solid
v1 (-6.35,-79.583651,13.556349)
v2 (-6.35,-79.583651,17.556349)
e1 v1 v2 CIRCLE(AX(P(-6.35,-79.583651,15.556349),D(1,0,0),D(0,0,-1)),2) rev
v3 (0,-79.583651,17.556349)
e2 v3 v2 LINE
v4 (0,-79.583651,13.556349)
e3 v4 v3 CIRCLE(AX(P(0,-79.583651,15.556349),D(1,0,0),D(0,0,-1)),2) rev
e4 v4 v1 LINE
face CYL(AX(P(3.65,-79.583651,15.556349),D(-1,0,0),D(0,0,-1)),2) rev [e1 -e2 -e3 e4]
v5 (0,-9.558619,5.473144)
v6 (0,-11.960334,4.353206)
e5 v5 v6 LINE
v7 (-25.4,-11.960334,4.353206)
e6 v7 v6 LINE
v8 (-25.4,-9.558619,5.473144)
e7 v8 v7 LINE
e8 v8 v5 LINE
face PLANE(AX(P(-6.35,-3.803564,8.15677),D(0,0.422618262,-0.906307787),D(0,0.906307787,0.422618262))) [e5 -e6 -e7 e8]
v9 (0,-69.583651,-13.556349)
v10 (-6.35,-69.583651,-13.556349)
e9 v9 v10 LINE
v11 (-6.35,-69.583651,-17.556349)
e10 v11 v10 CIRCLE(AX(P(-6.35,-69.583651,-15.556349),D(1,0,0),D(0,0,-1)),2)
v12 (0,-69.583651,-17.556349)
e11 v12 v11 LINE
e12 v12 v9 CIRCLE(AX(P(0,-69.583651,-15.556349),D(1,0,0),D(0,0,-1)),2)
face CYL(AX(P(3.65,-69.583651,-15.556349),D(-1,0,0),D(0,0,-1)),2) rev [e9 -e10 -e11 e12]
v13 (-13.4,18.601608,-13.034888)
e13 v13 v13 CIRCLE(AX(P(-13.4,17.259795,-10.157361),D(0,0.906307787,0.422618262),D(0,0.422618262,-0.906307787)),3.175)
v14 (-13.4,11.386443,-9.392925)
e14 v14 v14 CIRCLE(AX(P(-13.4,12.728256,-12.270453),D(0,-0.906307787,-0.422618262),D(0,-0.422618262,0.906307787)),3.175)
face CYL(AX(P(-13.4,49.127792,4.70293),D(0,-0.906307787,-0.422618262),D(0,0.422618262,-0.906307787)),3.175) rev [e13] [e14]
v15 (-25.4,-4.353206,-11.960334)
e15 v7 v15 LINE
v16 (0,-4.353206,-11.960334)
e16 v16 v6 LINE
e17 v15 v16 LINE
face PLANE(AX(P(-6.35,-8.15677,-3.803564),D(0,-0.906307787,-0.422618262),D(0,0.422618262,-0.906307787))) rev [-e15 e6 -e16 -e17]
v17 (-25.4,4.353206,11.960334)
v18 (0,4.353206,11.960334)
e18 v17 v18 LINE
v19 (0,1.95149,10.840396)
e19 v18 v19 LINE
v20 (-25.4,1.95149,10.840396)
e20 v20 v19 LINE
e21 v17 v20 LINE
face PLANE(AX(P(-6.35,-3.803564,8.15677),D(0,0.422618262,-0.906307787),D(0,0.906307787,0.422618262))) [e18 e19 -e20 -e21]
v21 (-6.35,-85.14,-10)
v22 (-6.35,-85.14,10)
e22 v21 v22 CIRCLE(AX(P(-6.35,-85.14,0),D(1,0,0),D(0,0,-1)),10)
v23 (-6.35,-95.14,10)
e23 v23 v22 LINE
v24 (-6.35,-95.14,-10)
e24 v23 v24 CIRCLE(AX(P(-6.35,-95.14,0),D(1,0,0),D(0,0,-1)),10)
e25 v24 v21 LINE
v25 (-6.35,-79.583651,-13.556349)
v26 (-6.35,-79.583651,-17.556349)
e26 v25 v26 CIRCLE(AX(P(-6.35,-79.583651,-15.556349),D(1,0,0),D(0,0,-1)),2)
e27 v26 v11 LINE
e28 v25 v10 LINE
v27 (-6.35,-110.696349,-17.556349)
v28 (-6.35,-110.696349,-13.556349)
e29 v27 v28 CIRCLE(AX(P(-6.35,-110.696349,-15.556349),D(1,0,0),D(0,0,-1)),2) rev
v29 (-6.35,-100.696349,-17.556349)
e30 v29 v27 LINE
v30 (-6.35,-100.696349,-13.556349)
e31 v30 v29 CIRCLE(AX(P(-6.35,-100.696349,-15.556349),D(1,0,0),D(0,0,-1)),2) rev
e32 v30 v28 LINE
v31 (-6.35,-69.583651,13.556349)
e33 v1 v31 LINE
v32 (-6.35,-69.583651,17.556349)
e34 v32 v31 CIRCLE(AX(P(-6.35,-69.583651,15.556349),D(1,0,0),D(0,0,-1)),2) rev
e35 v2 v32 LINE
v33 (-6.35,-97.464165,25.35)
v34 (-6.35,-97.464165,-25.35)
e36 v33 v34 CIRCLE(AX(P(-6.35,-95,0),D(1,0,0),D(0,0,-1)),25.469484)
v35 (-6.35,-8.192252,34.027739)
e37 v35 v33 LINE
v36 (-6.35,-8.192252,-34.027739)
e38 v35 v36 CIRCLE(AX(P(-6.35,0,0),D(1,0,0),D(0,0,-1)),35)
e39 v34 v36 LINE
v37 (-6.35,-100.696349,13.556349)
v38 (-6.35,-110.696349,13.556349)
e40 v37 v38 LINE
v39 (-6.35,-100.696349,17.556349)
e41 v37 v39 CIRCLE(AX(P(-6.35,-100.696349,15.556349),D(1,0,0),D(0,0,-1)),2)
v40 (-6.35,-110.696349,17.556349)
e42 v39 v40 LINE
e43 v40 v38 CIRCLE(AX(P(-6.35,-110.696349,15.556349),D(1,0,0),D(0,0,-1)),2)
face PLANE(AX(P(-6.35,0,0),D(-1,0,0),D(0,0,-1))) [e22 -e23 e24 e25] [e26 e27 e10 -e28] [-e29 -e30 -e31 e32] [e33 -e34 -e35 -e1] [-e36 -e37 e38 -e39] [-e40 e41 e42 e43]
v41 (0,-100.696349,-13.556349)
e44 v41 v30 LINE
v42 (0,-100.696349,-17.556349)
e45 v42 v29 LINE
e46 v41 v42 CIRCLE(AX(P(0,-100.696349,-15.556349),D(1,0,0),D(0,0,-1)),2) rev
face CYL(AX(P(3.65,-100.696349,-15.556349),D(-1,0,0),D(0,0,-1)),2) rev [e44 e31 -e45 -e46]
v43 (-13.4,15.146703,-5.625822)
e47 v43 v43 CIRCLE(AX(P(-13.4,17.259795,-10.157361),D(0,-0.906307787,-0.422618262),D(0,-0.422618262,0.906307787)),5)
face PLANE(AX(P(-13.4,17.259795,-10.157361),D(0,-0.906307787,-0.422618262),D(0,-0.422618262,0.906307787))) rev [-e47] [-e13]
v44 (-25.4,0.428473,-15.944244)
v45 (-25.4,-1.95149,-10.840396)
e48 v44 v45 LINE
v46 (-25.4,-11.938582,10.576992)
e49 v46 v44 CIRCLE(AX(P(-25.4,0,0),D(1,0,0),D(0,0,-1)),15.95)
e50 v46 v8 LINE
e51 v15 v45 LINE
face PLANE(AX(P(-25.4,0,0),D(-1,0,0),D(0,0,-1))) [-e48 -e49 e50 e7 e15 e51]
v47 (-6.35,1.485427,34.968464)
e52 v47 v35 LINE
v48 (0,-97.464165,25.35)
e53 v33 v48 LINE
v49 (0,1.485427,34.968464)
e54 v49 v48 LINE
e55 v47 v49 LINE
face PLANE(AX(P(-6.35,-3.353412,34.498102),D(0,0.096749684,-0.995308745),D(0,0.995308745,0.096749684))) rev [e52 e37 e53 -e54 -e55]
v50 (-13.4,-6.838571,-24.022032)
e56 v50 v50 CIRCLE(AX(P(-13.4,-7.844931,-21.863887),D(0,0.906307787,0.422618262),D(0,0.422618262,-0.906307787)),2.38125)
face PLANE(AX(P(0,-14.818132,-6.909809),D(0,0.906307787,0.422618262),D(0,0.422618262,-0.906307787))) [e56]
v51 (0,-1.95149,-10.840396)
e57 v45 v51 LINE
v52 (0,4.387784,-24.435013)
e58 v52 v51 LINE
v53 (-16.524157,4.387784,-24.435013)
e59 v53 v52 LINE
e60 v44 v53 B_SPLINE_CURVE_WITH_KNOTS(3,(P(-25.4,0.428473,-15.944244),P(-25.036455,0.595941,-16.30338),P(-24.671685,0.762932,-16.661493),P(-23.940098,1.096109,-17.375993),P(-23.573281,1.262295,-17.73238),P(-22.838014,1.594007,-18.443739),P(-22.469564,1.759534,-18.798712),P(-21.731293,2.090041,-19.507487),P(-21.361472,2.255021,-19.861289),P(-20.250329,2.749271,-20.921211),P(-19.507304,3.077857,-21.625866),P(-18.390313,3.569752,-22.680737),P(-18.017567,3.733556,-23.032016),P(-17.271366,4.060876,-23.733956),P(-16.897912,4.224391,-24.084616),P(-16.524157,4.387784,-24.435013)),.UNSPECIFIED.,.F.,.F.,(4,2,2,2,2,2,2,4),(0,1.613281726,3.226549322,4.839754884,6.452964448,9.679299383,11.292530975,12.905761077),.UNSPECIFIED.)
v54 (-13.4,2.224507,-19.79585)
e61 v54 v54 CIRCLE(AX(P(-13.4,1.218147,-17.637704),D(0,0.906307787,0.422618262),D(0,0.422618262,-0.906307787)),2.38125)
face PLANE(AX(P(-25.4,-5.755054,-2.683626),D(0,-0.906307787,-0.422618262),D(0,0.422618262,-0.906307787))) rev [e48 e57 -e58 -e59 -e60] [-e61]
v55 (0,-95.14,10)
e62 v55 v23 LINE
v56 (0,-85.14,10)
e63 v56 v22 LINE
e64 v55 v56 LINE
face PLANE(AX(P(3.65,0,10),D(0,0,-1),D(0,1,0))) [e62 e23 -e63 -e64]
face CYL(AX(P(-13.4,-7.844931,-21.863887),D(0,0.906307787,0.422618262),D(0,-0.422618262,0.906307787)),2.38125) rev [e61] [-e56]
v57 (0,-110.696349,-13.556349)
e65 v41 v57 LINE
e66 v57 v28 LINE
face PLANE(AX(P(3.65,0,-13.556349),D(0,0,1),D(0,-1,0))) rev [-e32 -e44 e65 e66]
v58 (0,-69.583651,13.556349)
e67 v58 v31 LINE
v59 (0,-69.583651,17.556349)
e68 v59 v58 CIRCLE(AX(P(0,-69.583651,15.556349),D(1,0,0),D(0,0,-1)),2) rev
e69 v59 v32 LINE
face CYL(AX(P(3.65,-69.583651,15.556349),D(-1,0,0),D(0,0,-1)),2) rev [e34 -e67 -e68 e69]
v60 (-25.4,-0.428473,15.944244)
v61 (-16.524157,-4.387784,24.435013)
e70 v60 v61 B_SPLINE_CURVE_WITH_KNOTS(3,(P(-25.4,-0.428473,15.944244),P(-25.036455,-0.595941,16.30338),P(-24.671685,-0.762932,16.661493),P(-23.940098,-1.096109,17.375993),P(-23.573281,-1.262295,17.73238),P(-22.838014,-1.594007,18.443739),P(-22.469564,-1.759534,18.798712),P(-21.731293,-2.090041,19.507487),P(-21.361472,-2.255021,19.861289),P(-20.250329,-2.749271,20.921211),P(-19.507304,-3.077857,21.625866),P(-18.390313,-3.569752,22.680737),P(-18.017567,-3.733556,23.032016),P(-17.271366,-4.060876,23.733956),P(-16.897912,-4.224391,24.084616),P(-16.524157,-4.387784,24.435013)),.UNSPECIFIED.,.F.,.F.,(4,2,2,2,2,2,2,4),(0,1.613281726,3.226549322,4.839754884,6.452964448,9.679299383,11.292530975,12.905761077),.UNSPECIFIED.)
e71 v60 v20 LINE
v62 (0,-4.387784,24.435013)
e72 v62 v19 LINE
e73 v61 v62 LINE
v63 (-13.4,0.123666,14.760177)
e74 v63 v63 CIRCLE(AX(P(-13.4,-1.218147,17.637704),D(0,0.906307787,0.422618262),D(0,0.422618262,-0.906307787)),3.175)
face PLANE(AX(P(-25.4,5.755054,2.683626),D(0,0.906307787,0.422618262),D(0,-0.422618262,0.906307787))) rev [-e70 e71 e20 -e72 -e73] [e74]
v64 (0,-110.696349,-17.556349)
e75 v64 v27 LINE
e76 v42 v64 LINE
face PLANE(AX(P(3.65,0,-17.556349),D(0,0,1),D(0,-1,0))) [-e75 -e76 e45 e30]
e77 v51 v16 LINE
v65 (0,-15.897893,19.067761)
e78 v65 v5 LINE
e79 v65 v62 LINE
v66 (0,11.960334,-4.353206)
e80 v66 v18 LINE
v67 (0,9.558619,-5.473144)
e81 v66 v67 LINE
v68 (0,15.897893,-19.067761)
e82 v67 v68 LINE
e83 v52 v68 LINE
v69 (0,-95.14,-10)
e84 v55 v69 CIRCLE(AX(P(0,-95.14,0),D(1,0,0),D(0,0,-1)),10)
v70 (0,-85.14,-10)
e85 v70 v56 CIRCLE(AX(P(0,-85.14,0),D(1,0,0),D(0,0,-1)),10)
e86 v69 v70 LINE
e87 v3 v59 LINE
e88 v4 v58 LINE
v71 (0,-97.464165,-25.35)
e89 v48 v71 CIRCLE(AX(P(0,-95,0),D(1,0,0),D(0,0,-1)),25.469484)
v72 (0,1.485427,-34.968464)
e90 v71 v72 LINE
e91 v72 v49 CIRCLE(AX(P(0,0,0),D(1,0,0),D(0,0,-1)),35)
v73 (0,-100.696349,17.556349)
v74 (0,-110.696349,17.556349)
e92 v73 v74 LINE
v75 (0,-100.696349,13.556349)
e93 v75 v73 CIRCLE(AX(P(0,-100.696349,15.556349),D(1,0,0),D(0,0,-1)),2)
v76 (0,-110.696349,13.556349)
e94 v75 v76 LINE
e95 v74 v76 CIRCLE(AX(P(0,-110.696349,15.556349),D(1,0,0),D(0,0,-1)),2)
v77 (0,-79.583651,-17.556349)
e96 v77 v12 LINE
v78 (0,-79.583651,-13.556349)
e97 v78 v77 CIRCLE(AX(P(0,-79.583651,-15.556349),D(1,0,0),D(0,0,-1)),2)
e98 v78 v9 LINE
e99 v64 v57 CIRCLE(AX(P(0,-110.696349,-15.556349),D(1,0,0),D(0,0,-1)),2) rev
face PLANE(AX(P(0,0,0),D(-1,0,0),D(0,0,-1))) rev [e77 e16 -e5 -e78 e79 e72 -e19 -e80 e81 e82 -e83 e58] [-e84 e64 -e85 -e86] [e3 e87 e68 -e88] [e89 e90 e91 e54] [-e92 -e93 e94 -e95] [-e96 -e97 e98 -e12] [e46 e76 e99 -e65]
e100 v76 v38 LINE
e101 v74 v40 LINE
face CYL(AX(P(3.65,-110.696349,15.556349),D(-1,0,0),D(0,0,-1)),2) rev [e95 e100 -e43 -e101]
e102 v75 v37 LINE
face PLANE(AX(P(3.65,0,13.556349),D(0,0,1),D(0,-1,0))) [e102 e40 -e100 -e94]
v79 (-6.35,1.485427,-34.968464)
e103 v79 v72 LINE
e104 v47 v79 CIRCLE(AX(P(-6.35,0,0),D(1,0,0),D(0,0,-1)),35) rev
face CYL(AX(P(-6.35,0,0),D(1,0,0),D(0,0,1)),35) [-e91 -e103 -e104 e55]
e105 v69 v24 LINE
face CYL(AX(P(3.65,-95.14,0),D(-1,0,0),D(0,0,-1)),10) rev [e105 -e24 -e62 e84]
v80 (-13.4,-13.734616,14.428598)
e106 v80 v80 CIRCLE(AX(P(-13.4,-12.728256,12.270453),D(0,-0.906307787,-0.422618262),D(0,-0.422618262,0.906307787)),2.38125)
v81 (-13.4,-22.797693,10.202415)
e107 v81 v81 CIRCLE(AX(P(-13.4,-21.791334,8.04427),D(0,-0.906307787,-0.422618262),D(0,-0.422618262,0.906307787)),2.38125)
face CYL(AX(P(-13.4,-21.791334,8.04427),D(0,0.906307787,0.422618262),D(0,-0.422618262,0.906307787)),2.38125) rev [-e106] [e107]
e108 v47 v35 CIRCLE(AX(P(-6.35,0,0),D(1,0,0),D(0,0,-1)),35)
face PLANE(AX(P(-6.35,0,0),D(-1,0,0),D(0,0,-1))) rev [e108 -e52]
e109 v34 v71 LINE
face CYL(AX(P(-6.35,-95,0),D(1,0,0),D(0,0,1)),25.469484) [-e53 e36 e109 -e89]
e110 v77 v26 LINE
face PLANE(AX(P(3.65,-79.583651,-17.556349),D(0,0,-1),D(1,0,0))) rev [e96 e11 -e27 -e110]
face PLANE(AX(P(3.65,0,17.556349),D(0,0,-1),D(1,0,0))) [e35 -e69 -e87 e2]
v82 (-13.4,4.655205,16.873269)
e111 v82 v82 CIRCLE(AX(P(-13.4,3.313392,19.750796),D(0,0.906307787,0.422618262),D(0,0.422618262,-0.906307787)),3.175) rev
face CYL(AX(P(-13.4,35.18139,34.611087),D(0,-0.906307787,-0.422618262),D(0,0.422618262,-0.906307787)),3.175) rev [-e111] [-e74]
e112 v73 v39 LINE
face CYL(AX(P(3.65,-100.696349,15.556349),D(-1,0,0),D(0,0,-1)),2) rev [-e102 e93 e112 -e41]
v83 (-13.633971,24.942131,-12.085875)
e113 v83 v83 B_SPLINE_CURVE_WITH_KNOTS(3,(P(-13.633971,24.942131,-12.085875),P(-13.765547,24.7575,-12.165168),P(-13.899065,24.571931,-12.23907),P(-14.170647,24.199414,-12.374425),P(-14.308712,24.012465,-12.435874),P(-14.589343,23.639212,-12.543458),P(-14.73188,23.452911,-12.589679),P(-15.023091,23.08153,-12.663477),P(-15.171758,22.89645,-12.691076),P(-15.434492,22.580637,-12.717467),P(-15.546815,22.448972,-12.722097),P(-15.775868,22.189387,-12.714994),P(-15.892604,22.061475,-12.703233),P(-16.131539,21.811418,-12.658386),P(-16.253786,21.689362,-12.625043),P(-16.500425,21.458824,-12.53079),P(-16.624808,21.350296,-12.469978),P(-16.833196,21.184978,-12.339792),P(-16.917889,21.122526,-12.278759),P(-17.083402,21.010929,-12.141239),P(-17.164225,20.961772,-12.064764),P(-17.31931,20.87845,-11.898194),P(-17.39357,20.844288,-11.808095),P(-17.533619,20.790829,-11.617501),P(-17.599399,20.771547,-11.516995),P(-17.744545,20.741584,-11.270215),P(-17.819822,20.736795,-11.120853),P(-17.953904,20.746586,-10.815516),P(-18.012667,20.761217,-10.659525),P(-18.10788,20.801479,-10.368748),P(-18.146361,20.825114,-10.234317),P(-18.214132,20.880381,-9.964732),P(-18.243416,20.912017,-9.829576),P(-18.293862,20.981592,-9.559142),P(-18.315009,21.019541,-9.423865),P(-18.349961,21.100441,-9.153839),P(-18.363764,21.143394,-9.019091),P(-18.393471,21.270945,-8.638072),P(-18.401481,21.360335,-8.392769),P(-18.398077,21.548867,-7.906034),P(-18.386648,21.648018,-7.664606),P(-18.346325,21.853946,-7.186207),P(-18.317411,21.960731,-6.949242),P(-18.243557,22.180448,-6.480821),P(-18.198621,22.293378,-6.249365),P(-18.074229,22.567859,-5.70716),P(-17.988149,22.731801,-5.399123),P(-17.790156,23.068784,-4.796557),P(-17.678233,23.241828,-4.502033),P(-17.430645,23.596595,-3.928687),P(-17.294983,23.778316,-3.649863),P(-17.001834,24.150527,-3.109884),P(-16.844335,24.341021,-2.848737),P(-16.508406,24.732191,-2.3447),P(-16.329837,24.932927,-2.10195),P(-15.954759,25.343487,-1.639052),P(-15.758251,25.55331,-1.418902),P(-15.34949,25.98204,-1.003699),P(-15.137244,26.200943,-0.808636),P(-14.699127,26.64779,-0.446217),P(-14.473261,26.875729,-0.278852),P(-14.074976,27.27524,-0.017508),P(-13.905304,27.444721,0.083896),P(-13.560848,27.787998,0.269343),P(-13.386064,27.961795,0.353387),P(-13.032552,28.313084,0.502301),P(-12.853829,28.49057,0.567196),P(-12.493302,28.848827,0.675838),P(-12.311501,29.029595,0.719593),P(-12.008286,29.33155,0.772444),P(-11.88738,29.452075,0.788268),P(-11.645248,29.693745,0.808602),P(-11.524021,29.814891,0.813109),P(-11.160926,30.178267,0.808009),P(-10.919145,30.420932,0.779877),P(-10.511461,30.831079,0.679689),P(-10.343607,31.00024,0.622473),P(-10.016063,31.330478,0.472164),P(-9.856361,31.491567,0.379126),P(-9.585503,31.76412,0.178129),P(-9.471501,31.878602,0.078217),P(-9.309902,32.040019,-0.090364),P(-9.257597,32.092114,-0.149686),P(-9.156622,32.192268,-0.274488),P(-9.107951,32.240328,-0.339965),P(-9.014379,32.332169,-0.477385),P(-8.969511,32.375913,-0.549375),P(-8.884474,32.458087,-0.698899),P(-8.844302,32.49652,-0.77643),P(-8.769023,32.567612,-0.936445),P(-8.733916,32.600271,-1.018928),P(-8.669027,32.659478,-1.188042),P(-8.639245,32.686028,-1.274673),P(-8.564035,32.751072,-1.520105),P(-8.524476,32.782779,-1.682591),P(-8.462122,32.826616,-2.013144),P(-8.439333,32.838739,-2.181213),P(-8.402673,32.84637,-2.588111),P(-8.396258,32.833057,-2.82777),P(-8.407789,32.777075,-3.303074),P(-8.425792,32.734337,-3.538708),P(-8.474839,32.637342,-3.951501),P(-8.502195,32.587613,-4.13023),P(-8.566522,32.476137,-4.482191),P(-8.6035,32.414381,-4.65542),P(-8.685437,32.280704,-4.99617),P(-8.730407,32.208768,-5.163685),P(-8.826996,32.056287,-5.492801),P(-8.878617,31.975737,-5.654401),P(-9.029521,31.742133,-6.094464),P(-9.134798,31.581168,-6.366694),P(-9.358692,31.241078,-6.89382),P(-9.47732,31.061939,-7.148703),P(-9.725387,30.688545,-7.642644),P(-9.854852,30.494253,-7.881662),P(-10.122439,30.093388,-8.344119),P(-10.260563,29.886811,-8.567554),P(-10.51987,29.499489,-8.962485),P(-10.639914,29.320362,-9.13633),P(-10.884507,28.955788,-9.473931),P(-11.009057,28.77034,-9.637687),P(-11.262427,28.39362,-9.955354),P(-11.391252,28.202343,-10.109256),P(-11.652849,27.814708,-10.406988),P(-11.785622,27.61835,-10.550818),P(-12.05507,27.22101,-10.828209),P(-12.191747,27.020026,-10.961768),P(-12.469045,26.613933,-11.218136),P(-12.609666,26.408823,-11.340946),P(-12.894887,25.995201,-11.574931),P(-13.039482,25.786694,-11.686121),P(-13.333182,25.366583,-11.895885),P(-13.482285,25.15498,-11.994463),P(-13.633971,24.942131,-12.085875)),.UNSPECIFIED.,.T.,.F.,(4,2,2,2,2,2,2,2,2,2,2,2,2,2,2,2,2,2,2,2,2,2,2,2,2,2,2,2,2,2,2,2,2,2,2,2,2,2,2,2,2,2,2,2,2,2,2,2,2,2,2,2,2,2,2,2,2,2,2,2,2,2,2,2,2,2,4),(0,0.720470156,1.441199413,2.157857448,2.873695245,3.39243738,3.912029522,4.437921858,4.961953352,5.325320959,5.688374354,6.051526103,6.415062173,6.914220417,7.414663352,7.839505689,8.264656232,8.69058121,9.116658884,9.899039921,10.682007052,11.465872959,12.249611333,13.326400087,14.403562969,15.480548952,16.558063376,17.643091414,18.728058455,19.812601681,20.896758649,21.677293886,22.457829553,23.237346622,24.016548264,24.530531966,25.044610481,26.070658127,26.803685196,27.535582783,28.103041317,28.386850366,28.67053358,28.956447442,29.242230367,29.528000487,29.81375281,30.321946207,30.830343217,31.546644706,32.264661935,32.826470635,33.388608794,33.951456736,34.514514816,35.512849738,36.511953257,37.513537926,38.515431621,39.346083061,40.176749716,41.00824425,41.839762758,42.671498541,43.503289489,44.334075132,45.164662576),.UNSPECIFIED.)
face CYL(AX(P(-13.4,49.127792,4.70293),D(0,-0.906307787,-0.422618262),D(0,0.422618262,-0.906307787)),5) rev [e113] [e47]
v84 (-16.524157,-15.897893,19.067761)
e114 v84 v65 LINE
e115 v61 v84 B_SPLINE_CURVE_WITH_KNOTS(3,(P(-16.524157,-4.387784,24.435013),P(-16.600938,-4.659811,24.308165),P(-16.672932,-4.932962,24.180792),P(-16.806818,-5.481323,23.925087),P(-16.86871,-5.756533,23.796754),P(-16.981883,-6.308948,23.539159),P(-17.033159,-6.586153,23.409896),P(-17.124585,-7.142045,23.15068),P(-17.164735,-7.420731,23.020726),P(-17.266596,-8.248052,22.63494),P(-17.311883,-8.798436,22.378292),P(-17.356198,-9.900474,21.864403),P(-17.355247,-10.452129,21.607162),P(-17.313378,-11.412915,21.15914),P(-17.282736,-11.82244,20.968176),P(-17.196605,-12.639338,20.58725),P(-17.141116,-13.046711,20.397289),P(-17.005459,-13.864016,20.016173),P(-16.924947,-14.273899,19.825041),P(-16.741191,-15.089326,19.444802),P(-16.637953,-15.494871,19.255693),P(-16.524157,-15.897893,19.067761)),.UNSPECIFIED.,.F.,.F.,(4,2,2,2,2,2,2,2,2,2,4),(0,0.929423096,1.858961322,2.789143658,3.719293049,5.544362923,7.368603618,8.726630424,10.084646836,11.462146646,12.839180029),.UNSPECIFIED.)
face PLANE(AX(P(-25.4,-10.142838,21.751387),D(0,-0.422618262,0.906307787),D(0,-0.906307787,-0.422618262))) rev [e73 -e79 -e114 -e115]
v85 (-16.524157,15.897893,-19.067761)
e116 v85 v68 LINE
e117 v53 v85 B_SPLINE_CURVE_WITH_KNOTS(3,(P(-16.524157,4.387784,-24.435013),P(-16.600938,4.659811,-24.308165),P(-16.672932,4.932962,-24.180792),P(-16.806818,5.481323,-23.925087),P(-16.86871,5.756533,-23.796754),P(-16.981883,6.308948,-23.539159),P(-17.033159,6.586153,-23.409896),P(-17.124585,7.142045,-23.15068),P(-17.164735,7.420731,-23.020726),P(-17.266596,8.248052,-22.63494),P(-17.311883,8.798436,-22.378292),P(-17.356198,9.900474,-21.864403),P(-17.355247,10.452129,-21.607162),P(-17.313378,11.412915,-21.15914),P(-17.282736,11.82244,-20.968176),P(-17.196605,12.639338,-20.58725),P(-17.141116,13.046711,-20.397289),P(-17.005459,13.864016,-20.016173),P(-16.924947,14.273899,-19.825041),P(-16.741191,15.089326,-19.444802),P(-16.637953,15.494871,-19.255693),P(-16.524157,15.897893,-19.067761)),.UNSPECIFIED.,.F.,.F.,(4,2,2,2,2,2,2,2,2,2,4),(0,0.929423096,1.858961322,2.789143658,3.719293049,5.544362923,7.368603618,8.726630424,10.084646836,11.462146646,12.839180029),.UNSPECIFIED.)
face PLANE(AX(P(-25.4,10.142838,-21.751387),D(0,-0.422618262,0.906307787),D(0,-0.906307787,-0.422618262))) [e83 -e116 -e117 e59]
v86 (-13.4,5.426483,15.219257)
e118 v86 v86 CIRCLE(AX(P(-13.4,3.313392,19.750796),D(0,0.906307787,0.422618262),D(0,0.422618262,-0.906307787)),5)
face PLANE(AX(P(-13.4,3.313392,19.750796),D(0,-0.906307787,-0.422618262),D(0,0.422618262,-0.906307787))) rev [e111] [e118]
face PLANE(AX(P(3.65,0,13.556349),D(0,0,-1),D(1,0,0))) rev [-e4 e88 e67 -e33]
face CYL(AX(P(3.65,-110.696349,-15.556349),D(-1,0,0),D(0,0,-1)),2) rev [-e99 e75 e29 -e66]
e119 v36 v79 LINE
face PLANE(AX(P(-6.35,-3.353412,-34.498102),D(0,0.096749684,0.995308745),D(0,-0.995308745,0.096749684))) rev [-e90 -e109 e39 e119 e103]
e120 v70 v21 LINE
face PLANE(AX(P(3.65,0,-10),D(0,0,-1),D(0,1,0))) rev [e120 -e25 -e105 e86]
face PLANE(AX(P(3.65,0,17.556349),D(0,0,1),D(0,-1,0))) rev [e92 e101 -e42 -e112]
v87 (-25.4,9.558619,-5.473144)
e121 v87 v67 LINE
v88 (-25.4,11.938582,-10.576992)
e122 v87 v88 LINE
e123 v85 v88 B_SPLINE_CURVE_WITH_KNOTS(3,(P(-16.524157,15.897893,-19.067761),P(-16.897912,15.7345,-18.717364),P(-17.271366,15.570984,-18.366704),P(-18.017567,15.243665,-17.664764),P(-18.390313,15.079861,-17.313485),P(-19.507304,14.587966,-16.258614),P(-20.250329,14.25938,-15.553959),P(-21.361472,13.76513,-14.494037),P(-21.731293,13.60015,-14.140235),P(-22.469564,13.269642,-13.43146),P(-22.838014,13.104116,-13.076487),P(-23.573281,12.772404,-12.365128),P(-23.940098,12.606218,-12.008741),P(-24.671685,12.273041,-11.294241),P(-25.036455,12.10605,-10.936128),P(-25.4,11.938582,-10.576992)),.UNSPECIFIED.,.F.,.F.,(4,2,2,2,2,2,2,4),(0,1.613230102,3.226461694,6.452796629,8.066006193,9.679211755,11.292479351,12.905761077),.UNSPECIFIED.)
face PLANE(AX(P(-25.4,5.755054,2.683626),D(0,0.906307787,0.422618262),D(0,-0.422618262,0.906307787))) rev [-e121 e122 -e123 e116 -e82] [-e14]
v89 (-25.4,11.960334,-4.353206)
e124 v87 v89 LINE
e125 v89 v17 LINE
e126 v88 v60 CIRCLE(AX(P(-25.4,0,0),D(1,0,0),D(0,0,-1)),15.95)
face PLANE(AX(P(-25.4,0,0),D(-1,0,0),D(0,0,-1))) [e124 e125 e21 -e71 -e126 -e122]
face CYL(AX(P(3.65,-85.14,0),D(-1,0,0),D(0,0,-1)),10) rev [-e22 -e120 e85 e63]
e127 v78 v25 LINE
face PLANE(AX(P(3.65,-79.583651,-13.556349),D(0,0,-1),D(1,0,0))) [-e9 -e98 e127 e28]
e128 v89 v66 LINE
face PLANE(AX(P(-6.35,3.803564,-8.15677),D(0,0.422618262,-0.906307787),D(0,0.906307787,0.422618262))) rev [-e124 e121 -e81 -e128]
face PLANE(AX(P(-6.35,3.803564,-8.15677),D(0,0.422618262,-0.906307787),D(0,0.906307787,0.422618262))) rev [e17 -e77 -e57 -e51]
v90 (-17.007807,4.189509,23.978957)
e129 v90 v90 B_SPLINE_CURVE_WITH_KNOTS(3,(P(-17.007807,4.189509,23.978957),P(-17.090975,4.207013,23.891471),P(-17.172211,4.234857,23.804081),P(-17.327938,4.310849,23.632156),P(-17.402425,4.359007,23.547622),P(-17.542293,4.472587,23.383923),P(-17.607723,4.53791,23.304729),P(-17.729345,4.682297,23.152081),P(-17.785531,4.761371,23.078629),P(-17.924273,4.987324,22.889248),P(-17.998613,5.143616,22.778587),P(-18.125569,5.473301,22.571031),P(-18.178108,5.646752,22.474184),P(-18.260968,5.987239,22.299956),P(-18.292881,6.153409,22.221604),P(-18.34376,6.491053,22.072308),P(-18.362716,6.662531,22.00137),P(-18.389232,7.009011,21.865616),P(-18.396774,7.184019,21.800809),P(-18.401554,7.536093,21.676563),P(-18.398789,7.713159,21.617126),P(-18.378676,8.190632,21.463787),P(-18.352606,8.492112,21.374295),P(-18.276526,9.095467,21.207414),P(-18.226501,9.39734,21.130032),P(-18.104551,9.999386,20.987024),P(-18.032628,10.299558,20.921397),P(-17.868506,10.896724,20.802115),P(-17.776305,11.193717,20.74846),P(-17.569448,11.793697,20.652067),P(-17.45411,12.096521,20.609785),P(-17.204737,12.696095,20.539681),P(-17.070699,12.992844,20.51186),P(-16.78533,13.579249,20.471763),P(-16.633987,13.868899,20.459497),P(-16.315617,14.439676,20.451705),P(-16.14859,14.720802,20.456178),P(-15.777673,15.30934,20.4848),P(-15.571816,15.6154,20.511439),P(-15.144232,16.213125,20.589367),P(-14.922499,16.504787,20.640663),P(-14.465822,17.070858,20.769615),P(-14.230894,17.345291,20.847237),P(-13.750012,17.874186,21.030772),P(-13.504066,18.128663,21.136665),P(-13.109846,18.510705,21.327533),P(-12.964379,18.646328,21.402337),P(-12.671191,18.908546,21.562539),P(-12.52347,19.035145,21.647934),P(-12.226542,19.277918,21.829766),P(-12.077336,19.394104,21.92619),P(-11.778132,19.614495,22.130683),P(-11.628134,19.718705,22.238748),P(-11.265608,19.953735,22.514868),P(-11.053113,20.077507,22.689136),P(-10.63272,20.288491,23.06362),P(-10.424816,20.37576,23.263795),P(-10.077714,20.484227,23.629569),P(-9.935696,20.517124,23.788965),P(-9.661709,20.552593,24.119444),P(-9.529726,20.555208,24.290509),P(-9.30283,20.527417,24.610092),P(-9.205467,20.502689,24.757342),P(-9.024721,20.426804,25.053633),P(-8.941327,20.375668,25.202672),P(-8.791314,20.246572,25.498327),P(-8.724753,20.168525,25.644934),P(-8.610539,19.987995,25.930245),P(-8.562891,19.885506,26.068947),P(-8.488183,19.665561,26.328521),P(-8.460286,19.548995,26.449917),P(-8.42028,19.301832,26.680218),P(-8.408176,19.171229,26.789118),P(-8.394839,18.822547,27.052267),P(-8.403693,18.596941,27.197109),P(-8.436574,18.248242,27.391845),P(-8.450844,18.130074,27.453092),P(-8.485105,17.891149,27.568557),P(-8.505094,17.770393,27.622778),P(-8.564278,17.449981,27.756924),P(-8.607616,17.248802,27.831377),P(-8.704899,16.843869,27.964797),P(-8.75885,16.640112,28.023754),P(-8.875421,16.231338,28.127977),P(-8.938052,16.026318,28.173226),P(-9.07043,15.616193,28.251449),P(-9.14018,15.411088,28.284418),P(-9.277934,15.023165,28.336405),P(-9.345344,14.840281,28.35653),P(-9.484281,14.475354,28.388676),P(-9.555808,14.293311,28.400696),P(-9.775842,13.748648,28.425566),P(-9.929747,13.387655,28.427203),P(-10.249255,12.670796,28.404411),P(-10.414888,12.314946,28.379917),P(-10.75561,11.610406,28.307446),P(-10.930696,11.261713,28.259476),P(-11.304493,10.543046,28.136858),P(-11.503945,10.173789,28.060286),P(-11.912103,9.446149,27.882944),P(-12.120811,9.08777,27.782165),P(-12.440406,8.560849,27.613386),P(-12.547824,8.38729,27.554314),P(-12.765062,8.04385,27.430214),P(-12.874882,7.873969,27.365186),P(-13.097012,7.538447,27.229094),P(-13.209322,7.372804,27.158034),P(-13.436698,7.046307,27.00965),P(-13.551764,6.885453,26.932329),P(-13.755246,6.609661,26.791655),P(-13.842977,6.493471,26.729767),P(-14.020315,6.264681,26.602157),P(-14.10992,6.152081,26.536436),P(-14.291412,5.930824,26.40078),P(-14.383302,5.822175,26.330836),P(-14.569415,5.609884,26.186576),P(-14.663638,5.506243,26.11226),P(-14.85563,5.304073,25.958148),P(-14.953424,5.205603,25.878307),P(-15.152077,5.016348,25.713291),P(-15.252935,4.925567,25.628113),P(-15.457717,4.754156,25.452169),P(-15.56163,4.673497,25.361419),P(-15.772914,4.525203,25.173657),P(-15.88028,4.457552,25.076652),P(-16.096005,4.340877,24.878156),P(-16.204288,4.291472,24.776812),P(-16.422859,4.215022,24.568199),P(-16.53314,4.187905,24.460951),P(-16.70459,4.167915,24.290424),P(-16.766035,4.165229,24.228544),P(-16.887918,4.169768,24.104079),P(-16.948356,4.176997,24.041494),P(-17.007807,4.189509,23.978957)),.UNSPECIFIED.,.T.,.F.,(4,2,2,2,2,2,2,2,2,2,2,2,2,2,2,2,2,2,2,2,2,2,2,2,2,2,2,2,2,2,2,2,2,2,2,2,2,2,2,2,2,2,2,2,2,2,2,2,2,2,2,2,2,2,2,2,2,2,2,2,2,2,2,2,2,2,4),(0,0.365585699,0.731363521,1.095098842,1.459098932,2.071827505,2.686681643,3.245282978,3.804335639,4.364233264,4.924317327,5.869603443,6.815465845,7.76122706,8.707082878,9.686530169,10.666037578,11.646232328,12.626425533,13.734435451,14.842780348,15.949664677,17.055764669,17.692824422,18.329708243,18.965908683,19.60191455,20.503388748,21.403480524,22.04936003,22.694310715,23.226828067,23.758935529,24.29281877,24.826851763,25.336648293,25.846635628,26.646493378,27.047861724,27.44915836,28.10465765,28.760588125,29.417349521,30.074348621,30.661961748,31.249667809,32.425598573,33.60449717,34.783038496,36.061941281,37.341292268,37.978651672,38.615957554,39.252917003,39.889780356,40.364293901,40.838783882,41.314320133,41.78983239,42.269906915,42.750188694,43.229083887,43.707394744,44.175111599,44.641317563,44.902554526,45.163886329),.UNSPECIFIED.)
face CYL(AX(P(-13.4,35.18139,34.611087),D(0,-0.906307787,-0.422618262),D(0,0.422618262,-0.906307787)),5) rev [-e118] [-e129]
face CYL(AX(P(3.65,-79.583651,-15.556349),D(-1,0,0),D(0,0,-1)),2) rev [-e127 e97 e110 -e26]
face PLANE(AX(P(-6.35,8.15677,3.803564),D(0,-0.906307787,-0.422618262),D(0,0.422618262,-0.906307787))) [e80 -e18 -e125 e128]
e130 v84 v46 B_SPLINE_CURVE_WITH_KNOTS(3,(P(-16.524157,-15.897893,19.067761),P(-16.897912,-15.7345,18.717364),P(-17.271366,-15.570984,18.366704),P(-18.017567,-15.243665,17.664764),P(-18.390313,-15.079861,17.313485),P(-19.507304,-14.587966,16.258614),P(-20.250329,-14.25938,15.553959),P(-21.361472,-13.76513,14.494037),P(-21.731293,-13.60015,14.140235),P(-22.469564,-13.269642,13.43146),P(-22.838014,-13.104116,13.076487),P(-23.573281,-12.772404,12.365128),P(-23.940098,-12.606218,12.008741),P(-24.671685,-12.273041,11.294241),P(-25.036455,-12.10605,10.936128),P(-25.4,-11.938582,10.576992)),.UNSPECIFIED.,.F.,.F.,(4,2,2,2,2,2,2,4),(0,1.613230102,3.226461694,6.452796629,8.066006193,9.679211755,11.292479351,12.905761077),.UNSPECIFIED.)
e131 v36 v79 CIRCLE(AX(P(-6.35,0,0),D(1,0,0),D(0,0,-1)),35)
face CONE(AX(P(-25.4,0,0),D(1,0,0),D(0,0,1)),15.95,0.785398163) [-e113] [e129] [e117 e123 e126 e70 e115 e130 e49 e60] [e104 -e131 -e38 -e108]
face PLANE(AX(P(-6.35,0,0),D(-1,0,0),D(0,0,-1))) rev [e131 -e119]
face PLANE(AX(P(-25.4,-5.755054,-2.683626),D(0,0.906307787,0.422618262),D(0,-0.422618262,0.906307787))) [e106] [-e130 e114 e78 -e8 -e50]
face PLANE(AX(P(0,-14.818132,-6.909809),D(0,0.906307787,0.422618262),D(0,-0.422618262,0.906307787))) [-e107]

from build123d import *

# Parameters (mm, degrees)
BOSS_EXTRUDE1_DEPTH = 6.35
SKETCH20_R          = 35
BOSS_EXTRUDE5_DEPTH = 19.05
CUT_EXTRUDE14_DEPTH = 128.996314535
CHAMFER1_SIZE       = 19.05
SKETCH22_R          = 3.175
CUT_EXTRUDE15_DEPTH = 135.156064825
SKETCH24_R          = 5
CUT_EXTRUDE16_DEPTH = 140.018309755
SKETCH25_R          = 2.38125
CUT_EXTRUDE17_DEPTH = 10
CUT_EXTRUDE18_DEPTH = 10


with BuildPart() as part:
    # Sketch1 → Boss-Extrude1 (new body)
    with BuildSketch(Plane(origin=(0, 0, 0), x_dir=(0, 0, -1), z_dir=(1, 0, 0))):
        with BuildLine():
            Line((-34.968464441, 1.48542743), (-25.35, -97.464164516))
            ThreePointArc((-25.35, -97.464164516), (0, -120.469483831), (25.35, -97.464164516))
            Line((25.35, -97.464164516), (34.968464441, 1.48542743))
            ThreePointArc((34.968464441, 1.48542743), (0, 35), (-34.968464441, 1.48542743))
        make_face()
        Polygon((4.353205728, 11.960334439), (-11.960334439, 4.353205728), (-4.353205728, -11.960334439), (11.960334439, -4.353205728), align=None, mode=Mode.SUBTRACT)
    extrude(amount=BOSS_EXTRUDE1_DEPTH)

    # Sketch20 → Boss-Extrude5 (add)
    with BuildSketch(Plane(origin=(6.35, 0, 0), x_dir=(0, 0, -1), z_dir=(1, 0, 0))):
        with Locations(Location((0, 0, 0), (0, 0, 177.567591624))):
            Circle(SKETCH20_R)
    extrude(amount=BOSS_EXTRUDE5_DEPTH)

    # Sketch21 → Cut-Extrude14 (cut, through all)
    with BuildSketch(Plane.ZY):
        Polygon((-19.067760927, 15.897892729), (-24.435012851, 4.387783834), (-10.840396045, -1.951490092), (-5.473144121, 9.558618803), align=None)
        Polygon((-11.960334439, -4.353205728), (-4.353205728, 11.960334439), (11.960334439, 4.353205728), (4.353205728, -11.960334439), align=None)
        Polygon((10.840396045, 1.951490092), (5.473144121, -9.558618803), (19.067760927, -15.897892729), (24.435012851, -4.387783834), align=None)
    extrude(amount=-CUT_EXTRUDE14_DEPTH, mode=Mode.SUBTRACT)

    # Chamfer1
    # the kernel refuses this chamfer: 19.05 mm, written as the material it takes off along each edge
    with BuildSketch(Plane(origin=(25.4, 0, 0), x_dir=(0, 0.042440783710504346, 0.9990989840241247), z_dir=(0, 0.9990989840241247, -0.042440783710504346))) as chamfer1_piece_1:
        Polygon((35, -CHAMFER1_SIZE), (35 - CHAMFER1_SIZE, 0), (35, 0), align=None)
    revolve(axis=Axis((25.4, 0, 0), (1, 0, 0)), mode=Mode.SUBTRACT)

    # Sketch22 → Cut-Extrude15 (cut, through all)
    with BuildSketch(Plane(origin=(0, 5.755054448, 2.683625962), x_dir=(-1, 0, 0), z_dir=(0, -0.9063077870366495, -0.4226182617407006))):
        with Locations(Location((-13.4, -16.5, 0), (0, 0, 90))):
            Circle(SKETCH22_R)
    cut_extrude15 = extrude(amount=-CUT_EXTRUDE15_DEPTH, mode=Mode.SUBTRACT)

    # Sketch24 → Cut-Extrude16 (cut, through all)
    with BuildSketch(Plane(origin=(0, 10.286593383, 4.796717271), x_dir=(-1, 0, 0), z_dir=(0, -0.9063077870366495, -0.4226182617407006))):
        with Locations(Location((-13.4, -16.5, 0), (0, 0, 90))):
            Circle(SKETCH24_R)
    cut_extrude16 = extrude(amount=-CUT_EXTRUDE16_DEPTH, mode=Mode.SUBTRACT)

    # Sketch25 → Cut-Extrude17 (cut)
    with BuildSketch(Plane(origin=(0, -5.755054448, -2.683625962), x_dir=(1, 0, 0), z_dir=(0, 0.9063077870366495, 0.4226182617407006))):
        with Locations(Location((13.4, -16.5, 0), (0, 0, 270))):
            Circle(SKETCH25_R)
    cut_extrude17 = extrude(amount=-CUT_EXTRUDE17_DEPTH, mode=Mode.SUBTRACT)

    # Mirror1: Cut-Extrude15, Cut-Extrude16, Cut-Extrude17 across plane
    add(cut_extrude15.mirror(Plane(origin=(0, 0, 0), x_dir=(1, 0, 0), z_dir=(0, 0.42261826174070105, -0.9063077870366493))), mode=Mode.SUBTRACT)
    add(cut_extrude16.mirror(Plane(origin=(0, 0, 0), x_dir=(1, 0, 0), z_dir=(0, 0.42261826174070105, -0.9063077870366493))), mode=Mode.SUBTRACT)
    add(cut_extrude17.mirror(Plane(origin=(0, 0, 0), x_dir=(1, 0, 0), z_dir=(0, 0.42261826174070105, -0.9063077870366493))), mode=Mode.SUBTRACT)

    # Sketch19 → Cut-Extrude18 (cut)
    with BuildSketch(Plane(origin=(6.35, 0, 0), x_dir=(0, 0, -1), z_dir=(1, 0, 0))):
        with BuildLine():
            Line((13.556349186, -69.583650814), (13.556349186, -79.583650814))
            ThreePointArc((13.556349186, -79.583650814), (15.556349186, -81.583650814), (17.556349186, -79.583650814))
            Line((17.556349186, -79.583650814), (17.556349186, -69.583650814))
            ThreePointArc((17.556349186, -69.583650814), (15.556349186, -67.583650814), (13.556349186, -69.583650814))
        make_face()
        with BuildLine():
            Line((-10, -85.14), (-10, -95.14))
            ThreePointArc((-10, -95.14), (0, -105.14), (10, -95.14))
            Line((10, -95.14), (10, -85.14))
            ThreePointArc((10, -85.14), (0, -75.14), (-10, -85.14))
        make_face()
        with BuildLine():
            Line((17.556349186, -110.696349186), (17.556349186, -100.696349186))
            ThreePointArc((17.556349186, -100.696349186), (15.556349186, -98.696349186), (13.556349186, -100.696349186))
            Line((13.556349186, -100.696349186), (13.556349186, -110.696349186))
            ThreePointArc((13.556349186, -110.696349186), (15.556349186, -112.696349186), (17.556349186, -110.696349186))
        make_face()
        with BuildLine():
            Line((-17.556349186, -69.583650814), (-17.556349186, -79.583650814))
            ThreePointArc((-17.556349186, -79.583650814), (-15.556349186, -81.583650814), (-13.556349186, -79.583650814))
            Line((-13.556349186, -79.583650814), (-13.556349186, -69.583650814))
            ThreePointArc((-13.556349186, -69.583650814), (-15.556349186, -67.583650814), (-17.556349186, -69.583650814))
        make_face()
        with BuildLine():
            Line((-13.556349186, -110.696349186), (-13.556349186, -100.696349186))
            ThreePointArc((-13.556349186, -100.696349186), (-15.556349186, -98.696349186), (-17.556349186, -100.696349186))
            Line((-17.556349186, -100.696349186), (-17.556349186, -110.696349186))
            ThreePointArc((-17.556349186, -110.696349186), (-15.556349186, -112.696349186), (-13.556349186, -110.696349186))
        make_face()
    extrude(amount=-CUT_EXTRUDE18_DEPTH, mode=Mode.SUBTRACT)


with BuildPart() as body_2:
    # Mirror2: mirrored copy
    add(part.part.mirror(Plane(origin=(0, 0, 0), x_dir=(0, 0, 1), z_dir=(1, 0, 0))))


solid = body_2.part
